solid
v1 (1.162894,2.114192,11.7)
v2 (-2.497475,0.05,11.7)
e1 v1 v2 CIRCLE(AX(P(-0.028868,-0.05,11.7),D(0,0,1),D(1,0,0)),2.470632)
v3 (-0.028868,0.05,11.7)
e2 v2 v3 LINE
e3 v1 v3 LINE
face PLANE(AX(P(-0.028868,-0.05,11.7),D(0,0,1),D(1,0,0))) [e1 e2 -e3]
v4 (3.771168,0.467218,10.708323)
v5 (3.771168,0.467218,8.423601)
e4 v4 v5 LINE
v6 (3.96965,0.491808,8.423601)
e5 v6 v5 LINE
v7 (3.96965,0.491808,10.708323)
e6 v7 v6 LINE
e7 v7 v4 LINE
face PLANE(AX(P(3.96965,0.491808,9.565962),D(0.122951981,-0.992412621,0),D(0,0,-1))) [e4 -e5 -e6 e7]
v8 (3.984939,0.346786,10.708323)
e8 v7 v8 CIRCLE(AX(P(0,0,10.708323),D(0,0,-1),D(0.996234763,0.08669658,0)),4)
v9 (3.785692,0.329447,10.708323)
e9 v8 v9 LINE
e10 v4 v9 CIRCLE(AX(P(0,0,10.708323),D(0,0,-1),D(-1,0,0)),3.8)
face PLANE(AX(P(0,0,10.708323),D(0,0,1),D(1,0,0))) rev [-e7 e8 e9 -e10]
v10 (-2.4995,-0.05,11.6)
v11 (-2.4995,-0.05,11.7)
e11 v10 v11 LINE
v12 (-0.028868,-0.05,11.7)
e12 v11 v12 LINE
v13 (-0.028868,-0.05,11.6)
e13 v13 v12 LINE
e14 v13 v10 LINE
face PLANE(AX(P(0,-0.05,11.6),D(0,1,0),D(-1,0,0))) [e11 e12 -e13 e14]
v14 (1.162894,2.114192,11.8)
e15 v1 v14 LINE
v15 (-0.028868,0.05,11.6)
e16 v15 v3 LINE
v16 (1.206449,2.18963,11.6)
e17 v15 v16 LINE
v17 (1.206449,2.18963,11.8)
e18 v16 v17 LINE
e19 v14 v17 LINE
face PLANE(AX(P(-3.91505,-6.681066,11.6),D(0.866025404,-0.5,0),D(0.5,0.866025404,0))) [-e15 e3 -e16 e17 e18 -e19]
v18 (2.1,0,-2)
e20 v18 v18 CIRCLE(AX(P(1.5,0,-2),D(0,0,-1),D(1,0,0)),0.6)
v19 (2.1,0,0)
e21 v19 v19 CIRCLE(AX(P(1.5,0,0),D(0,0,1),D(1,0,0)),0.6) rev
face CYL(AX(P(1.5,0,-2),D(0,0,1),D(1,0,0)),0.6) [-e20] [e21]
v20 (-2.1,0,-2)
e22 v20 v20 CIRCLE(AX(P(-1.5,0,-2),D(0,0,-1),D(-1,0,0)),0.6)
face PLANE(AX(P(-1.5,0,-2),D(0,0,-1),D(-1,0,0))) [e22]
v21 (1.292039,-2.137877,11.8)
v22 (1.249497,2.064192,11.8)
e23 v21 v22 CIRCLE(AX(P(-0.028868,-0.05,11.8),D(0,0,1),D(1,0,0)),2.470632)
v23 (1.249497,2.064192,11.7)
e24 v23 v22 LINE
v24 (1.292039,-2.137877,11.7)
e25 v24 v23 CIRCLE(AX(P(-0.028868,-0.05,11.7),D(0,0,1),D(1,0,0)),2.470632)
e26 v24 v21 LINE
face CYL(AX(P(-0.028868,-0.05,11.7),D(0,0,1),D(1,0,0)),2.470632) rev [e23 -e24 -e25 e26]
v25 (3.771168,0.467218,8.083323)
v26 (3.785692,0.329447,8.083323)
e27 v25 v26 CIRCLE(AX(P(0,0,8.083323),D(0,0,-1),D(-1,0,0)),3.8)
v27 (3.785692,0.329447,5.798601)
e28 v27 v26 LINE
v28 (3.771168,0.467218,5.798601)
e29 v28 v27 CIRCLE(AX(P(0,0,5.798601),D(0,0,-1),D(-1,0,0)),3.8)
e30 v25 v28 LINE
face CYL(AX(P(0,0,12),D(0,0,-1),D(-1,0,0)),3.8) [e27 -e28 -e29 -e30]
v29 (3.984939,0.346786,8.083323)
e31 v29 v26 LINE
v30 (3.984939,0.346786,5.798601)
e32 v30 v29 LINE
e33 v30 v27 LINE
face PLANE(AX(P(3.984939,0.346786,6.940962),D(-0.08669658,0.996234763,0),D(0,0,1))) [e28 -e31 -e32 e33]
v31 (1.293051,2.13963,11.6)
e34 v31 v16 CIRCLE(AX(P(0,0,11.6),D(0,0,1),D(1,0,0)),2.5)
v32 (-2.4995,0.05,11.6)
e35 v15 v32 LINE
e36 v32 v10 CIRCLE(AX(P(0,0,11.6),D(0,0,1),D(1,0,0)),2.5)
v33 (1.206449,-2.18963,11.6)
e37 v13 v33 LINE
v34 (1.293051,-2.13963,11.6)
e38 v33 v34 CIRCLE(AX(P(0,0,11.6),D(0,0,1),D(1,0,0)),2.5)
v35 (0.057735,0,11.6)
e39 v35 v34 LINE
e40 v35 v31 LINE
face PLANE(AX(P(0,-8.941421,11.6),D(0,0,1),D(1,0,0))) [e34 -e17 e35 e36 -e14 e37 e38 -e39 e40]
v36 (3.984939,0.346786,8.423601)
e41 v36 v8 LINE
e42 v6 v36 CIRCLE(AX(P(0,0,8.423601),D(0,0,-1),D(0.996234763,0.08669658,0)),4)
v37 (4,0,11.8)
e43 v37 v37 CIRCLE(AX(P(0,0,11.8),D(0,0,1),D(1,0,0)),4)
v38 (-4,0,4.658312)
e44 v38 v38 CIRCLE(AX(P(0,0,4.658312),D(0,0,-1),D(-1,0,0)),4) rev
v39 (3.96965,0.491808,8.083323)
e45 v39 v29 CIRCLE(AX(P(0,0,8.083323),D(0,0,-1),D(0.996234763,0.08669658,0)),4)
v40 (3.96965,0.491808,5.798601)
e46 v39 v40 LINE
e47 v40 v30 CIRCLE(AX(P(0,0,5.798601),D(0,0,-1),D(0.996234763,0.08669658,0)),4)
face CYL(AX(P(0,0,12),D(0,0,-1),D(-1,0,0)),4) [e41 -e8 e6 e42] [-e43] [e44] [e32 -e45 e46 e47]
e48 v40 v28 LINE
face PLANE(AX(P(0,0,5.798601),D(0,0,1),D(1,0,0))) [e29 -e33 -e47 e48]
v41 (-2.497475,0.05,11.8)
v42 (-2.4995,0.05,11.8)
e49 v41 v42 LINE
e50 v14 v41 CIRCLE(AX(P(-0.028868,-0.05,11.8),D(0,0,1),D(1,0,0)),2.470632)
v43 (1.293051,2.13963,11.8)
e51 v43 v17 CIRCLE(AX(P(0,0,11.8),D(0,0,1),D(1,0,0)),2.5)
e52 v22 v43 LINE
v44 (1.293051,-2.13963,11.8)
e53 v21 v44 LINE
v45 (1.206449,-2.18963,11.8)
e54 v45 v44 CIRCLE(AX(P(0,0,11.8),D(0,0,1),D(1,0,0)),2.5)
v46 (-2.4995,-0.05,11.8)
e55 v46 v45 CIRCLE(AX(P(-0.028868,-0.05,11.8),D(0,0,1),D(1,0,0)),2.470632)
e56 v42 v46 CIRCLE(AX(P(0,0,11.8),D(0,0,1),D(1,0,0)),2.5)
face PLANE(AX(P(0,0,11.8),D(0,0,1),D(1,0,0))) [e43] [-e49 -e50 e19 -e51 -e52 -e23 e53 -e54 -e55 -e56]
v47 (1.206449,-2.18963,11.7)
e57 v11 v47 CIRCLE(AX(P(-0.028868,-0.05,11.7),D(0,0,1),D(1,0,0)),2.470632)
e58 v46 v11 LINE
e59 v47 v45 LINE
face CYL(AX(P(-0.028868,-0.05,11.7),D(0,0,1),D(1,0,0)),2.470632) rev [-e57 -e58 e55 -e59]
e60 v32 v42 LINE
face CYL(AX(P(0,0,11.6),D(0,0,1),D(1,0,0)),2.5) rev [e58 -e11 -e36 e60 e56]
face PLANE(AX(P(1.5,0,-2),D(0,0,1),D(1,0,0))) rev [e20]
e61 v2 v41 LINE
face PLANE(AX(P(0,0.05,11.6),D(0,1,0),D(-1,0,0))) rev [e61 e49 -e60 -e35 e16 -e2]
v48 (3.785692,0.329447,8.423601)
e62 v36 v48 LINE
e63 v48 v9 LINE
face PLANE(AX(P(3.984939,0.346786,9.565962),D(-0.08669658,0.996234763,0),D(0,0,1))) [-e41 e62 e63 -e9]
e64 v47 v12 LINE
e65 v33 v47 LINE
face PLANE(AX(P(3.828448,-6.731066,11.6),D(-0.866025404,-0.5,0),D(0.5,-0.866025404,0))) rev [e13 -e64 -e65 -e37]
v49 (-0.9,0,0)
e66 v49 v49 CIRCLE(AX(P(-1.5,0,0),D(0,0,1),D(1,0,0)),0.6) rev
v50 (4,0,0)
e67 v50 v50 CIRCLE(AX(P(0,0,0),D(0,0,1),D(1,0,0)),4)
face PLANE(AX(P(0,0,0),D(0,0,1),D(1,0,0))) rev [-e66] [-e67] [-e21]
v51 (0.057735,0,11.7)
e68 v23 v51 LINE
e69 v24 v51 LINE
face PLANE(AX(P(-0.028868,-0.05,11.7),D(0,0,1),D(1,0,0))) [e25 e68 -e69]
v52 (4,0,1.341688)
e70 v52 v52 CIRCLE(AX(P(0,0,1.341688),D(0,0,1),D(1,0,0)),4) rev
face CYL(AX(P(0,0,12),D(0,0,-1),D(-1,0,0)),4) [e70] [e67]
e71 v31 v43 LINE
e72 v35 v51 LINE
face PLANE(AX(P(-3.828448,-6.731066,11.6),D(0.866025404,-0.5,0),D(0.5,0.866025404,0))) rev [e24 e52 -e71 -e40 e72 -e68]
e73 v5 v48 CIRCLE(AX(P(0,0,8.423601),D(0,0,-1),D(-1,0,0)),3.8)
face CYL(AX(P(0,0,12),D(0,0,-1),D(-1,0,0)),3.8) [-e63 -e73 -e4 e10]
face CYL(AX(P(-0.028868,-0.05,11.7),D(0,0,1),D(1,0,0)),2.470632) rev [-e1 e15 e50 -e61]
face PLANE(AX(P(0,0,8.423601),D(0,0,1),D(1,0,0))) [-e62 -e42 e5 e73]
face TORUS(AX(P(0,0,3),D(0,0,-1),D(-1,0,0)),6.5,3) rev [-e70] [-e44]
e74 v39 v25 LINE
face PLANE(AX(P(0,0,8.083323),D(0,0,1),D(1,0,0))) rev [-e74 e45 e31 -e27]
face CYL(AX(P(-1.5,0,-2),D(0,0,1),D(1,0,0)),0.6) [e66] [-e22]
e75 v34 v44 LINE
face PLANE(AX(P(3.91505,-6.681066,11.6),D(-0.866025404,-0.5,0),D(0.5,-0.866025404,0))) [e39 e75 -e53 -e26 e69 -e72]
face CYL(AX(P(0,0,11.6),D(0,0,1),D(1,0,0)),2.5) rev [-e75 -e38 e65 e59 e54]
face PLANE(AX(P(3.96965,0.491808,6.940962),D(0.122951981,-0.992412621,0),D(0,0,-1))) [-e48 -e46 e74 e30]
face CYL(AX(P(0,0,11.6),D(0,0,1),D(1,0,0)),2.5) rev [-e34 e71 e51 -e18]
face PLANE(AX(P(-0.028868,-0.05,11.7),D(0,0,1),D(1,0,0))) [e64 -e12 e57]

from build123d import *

# Parameters (mm, degrees)
SKETCH_1_R          = 4
EXTRUDE_1_DEPTH     = 12
SKETCH_2_R          = 6
CUT_EXTRUDE_1_DEPTH = 0.2
CUT_EXTRUDE_2_DEPTH = 0.2
SKETCH_5_R          = 0.6
EXTRUDE_2_DEPTH     = 2
SKETCH_7_R          = 2.470632437
CUT_EXTRUDE_3_DEPTH = 0.1
WRAP_START          = 5.798600642
WRAP_1_DEPTH        = 2.284722222
WRAP_START_2        = 8.423600642
WRAP_1_2_DEPTH      = 2.284722222


# Read off the part's stored shape, not the designer's step: 包覆1
with BuildPart() as part:
    # 草图1 → 凸台-拉伸1 (new body)
    with BuildSketch(Plane.XY):
        Circle(SKETCH_1_R)
    extrude(amount=EXTRUDE_1_DEPTH)

    # 草图2 → 切除-拉伸1 (cut)
    with BuildSketch(Plane.XY.offset(12)):
        Circle(SKETCH_2_R)
    extrude(amount=-CUT_EXTRUDE_1_DEPTH, mode=Mode.SUBTRACT)

    # 草图3 → 切除-拉伸2 (cut)
    with BuildSketch(Plane.XY.offset(11.8)):
        with BuildLine():
            Line((-0.04330127, 0.025), (-0.028867513, 0.05))
            Line((-0.028867513, 0.05), (-2.49949995, 0.05))
            ThreePointArc((-2.49949995, 0.05), (-2.5, 0), (-2.49949995, -0.05))
            Line((-2.49949995, -0.05), (-0.028867513, -0.05))
            Line((-0.028867513, -0.05), (-0.04330127, -0.025))
            Line((-0.04330127, -0.025), (0, 0))
            Line((0, 0), (-0.04330127, 0.025))
        make_face()
        with BuildLine():
            Line((0.04330127, -0.025), (0, 0))
            Line((0, 0), (0, -0.05))
            Line((0, -0.05), (-0.028867513, -0.05))
            Line((-0.028867513, -0.05), (1.206448705, -2.189630453))
            ThreePointArc((1.206448705, -2.189630453), (1.25, -2.165063509), (1.293051245, -2.139630453))
            Line((1.293051245, -2.139630453), (0.057735027, 0))
            Line((0.057735027, 0), (0.04330127, -0.025))
        make_face()
        with BuildLine():
            Line((-0.028867513, 0.05), (0, 0.05))
            Line((0, 0.05), (0, 0))
            Line((0, 0), (0.04330127, 0.025))
            Line((0.04330127, 0.025), (0.057735027, 0))
            Line((0.057735027, 0), (1.293051245, 2.139630453))
            ThreePointArc((1.293051245, 2.139630453), (1.25, 2.165063509), (1.206448705, 2.189630453))
            Line((1.206448705, 2.189630453), (-0.028867513, 0.05))
        make_face()
        Polygon((0, 0), (0, 0.05), (-0.028867513, 0.05), (-0.04330127, 0.025), align=None)
        Polygon((0, -0.05), (0, 0), (-0.04330127, -0.025), (-0.028867513, -0.05), align=None)
        Polygon((0.04330127, 0.025), (0, 0), (0.04330127, -0.025), (0.057735027, 0), align=None)
    extrude(amount=-CUT_EXTRUDE_2_DEPTH, mode=Mode.SUBTRACT)

    # 草图4 → 切除-旋转1 (revolve, cut)
    with BuildSketch(Plane(origin=(0, 0, 0), x_dir=(1, 0, 0), z_dir=(0, 1, 0))):
        with BuildLine():
            Line((-4.318421305, -0.940700508), (-4.318421305, -5.059299492))
            ThreePointArc((-4.318421305, -5.059299492), (-3.5, -3), (-4.318421305, -0.940700508))
        make_face()
    revolve(axis=Axis((0, 0, 0), (0, 0, 1)), mode=Mode.SUBTRACT)

    # 草图5 → 凸台-拉伸2 (add)
    with BuildSketch(Plane(origin=(0, 0, 0), x_dir=(-1, 0, 0), z_dir=(0, 0, -1))):
        with Locations(Location((1.5, 0, 0), (0, 0, 180))):
            Circle(SKETCH_5_R)
        with Locations(Location((-1.5, 0, 0), (0, 0, 180))):
            Circle(SKETCH_5_R)
    extrude(amount=EXTRUDE_2_DEPTH)

    # 草图7 → 切除-拉伸3 (cut)
    with BuildSketch(Plane.XY.offset(11.8)):
        with Locations((-0.028867513, -0.05)):
            Circle(SKETCH_7_R)
    extrude(amount=-CUT_EXTRUDE_3_DEPTH, mode=Mode.SUBTRACT)

    # 包覆1 outline → 包覆1 (cut)
    with BuildSketch(Plane.XY.offset(WRAP_START)):
        with BuildLine():
            Line((3.969650484, 0.491807924), (3.77116796, 0.467217528))
            ThreePointArc((3.77116796, 0.467217528), (3.779057907, 0.398398459), (3.785692099, 0.329447005))
            Line((3.785692099, 0.329447005), (3.984939052, 0.346786321))
            ThreePointArc((3.984939052, 0.346786321), (3.977955692, 0.419366799), (3.969650484, 0.491807924))
        make_face()
    extrude(amount=WRAP_1_DEPTH, mode=Mode.SUBTRACT)

    # Wrap 1 2 outline → Wrap 1 2 (cut)
    with BuildSketch(Plane.XY.offset(WRAP_START_2)):
        with BuildLine():
            Line((3.969650484, 0.491807924), (3.77116796, 0.467217528))
            ThreePointArc((3.77116796, 0.467217528), (3.779057907, 0.398398459), (3.785692099, 0.329447005))
            Line((3.785692099, 0.329447005), (3.984939052, 0.346786321))
            ThreePointArc((3.984939052, 0.346786321), (3.977955692, 0.419366799), (3.969650484, 0.491807924))
        make_face()
    extrude(amount=WRAP_1_2_DEPTH, mode=Mode.SUBTRACT)


solid = part.part
